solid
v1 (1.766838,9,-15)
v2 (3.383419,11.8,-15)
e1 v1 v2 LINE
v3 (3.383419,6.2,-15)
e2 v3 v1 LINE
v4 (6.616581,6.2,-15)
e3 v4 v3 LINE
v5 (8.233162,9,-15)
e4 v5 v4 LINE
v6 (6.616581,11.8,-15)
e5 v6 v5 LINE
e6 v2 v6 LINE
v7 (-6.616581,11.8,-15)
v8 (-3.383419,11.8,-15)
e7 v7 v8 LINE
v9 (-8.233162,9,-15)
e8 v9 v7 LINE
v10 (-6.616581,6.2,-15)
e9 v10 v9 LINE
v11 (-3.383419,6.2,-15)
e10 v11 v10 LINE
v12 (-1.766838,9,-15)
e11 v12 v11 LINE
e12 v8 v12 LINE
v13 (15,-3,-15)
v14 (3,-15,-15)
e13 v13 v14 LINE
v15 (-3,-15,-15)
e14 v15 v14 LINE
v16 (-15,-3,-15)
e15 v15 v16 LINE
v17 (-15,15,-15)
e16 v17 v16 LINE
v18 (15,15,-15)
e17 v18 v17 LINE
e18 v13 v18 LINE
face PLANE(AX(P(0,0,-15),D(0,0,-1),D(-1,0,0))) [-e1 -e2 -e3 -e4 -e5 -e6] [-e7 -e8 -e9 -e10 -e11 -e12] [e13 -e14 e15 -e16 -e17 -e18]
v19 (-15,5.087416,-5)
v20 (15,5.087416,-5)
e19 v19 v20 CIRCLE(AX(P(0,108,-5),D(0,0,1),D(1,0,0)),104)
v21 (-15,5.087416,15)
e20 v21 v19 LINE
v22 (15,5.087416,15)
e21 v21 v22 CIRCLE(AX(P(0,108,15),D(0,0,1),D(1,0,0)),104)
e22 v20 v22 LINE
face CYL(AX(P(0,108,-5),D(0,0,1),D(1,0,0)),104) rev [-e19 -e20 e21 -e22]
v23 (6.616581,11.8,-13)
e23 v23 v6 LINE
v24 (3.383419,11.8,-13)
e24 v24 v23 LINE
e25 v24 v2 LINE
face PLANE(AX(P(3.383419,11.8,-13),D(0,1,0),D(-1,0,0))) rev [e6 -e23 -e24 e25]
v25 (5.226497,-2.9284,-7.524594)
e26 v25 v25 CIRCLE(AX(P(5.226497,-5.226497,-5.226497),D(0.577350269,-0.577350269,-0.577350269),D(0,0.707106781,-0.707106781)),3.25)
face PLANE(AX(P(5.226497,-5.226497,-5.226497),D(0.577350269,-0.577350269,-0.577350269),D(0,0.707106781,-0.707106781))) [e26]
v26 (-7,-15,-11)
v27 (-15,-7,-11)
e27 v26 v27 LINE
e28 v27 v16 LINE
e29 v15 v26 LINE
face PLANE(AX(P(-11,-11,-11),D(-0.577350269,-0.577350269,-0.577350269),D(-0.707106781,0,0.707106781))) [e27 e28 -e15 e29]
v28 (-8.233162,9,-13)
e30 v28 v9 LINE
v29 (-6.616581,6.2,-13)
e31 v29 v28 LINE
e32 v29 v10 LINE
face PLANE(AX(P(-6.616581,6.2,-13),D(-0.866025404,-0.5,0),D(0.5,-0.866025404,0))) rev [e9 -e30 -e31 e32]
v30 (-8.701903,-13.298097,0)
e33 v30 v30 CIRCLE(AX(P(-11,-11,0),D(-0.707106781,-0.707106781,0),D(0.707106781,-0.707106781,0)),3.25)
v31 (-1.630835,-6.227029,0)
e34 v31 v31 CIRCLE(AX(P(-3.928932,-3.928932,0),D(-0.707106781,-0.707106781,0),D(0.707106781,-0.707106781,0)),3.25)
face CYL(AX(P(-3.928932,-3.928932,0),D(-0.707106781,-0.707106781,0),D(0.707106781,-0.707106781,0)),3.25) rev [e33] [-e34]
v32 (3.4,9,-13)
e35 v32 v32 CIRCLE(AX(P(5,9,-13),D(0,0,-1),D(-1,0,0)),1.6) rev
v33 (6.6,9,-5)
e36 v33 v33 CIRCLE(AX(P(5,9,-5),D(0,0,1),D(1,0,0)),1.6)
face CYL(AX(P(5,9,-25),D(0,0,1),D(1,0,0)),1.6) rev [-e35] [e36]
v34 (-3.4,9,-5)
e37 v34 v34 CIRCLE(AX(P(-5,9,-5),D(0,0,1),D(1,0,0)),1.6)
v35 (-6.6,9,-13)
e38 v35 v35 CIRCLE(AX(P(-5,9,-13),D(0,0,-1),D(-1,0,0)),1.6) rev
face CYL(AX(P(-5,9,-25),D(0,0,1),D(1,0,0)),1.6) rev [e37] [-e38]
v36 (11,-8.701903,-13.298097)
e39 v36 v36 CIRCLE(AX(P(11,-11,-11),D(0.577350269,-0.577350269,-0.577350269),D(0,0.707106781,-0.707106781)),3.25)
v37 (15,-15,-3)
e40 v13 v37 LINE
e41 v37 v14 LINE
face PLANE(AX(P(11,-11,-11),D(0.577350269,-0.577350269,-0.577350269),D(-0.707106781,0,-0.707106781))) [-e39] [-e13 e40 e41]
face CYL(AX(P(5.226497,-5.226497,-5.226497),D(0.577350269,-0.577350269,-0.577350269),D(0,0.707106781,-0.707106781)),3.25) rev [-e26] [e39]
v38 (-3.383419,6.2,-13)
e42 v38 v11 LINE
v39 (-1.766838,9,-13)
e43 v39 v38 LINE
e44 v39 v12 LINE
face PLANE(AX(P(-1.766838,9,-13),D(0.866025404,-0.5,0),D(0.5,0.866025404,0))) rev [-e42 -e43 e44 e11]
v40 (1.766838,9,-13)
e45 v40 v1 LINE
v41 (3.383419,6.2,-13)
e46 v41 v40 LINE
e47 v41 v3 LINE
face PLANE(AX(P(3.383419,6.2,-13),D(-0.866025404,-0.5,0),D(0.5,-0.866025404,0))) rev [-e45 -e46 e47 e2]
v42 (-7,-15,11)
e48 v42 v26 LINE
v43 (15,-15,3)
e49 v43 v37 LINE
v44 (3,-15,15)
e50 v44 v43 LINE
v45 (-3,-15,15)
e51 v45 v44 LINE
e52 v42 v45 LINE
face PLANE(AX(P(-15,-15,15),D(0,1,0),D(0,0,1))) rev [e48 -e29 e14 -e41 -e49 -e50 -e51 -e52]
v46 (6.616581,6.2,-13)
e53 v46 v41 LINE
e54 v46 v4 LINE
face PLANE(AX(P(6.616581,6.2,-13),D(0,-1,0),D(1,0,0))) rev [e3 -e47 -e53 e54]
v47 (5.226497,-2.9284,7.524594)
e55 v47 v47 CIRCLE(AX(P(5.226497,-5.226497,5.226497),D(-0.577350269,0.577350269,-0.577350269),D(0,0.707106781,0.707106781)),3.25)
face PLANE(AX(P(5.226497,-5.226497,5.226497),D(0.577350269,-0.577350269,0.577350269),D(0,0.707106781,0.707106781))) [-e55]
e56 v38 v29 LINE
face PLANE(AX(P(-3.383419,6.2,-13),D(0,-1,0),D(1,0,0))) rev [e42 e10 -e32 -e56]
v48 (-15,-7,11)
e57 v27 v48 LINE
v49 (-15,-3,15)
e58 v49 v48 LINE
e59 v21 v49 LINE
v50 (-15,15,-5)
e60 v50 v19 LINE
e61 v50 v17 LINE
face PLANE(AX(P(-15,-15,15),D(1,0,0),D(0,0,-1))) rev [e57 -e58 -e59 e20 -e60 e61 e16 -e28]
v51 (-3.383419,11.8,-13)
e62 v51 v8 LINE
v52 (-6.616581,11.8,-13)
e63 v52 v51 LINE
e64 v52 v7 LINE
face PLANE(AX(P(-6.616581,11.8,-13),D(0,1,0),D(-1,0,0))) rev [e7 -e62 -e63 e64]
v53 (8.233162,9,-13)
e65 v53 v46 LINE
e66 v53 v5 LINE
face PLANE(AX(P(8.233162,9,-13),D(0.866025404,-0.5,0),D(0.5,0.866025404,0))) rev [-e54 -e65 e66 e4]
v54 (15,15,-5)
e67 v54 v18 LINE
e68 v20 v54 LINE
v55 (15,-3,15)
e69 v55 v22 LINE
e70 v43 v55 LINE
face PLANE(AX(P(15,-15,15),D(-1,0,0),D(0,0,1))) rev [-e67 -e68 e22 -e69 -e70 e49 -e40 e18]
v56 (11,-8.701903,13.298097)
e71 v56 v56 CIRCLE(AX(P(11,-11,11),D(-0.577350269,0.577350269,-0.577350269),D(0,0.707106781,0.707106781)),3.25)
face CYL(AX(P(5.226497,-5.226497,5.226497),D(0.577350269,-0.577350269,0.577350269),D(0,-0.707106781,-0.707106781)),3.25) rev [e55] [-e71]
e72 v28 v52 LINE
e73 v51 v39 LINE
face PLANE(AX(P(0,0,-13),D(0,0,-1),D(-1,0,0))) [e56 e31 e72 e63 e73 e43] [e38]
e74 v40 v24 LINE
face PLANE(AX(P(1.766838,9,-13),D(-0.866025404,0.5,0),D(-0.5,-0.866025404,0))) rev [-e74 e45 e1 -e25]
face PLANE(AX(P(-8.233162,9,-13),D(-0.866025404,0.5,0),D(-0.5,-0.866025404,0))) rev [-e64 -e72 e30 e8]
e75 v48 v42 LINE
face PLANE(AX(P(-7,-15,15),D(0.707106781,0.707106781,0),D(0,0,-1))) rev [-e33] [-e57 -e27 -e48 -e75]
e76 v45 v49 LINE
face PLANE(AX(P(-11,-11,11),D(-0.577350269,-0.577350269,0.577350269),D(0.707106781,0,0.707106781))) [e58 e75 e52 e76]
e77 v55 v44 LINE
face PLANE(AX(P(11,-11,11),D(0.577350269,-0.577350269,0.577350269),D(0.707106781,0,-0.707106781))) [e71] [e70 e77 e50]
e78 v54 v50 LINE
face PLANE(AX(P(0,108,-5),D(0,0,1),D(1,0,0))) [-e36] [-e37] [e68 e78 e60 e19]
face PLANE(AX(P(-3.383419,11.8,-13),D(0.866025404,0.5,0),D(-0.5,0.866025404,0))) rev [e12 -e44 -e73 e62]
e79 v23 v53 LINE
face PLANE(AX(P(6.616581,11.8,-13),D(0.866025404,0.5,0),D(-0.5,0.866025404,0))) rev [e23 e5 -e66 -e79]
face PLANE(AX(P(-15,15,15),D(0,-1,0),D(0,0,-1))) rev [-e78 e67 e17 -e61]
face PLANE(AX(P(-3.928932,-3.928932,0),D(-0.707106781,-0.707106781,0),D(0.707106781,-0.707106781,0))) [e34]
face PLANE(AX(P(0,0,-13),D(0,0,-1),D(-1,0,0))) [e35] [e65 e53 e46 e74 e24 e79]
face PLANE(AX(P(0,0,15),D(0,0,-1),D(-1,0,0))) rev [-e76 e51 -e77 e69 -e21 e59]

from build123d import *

# Parameters (mm, degrees)
ESQUISSE1_W             = 30
ESQUISSE1_H             = 30
BOSS_EXTRU_1_DEPTH      = 15
CHANFREIN1_START        = 19.052558883
CHANFREIN1_OUTLINE_W    = 17
CHANFREIN1_OUTLINE_H    = 20
CHANFREIN1_DEPTH        = 7.947441117
CHANFREIN2_START        = 19.052558883
CHANFREIN2_OUTLINE_W    = 17
CHANFREIN2_OUTLINE_H    = 20
CHANFREIN2_DEPTH        = 7.947441117
ESQUISSE2_R             = 3.25
ENL_V_MAT_EXTRU_1_DEPTH = 10
CHANFREIN4_START        = -27
CHANFREIN4_OUTLINE_W    = 17
CHANFREIN4_OUTLINE_H    = 20
CHANFREIN4_DEPTH        = 7.947441117
CHANFREIN5_START        = -27
CHANFREIN5_OUTLINE_W    = 17
CHANFREIN5_OUTLINE_H    = 20
CHANFREIN5_DEPTH        = 7.947441117
CHANFREIN3_SIZE         = 8
ESQUISSE3_R             = 3.25
ENL_V_MAT_EXTRU_2_DEPTH = 10
ESQUISSE4_R             = 104
ENL_V_MAT_EXTRU_3_DEPTH = 20
ESQUISSE5_R             = 1.6
ENL_V_MAT_EXTRU_4_DEPTH = 20
ENL_V_MAT_EXTRU_5_DEPTH = 2


with BuildPart() as part:
    # Esquisse1 → Boss.-Extru.1 (new, symmetric)
    with BuildSketch(Plane.XY):
        Rectangle(ESQUISSE1_W, ESQUISSE1_H)
    extrude(amount=BOSS_EXTRU_1_DEPTH, both=True)

    # Chanfrein1: read off the stored shape, not the designer's step
    # Chanfrein1 outline → Chanfrein1 (cut)
    with BuildSketch(Plane(origin=(0, 0, 0), x_dir=(0.8164965809277258, 0.40824829046386313, 0.40824829046386313), z_dir=(0.5773502691896258, -0.5773502691896258, -0.5773502691896258)).offset(CHANFREIN1_START)):
        with Locations((-2.5, 0)):
            Rectangle(CHANFREIN1_OUTLINE_W, CHANFREIN1_OUTLINE_H)
    extrude(amount=CHANFREIN1_DEPTH, mode=Mode.SUBTRACT)

    # Chanfrein2: read off the stored shape, not the designer's step
    # Chanfrein2 outline → Chanfrein2 (cut)
    with BuildSketch(Plane(origin=(0, 0, 0), x_dir=(0.8164965809277258, 0.40824829046386313, -0.40824829046386313), z_dir=(0.5773502691896258, -0.5773502691896258, 0.5773502691896258)).offset(CHANFREIN2_START)):
        with Locations((-2.5, 0)):
            Rectangle(CHANFREIN2_OUTLINE_W, CHANFREIN2_OUTLINE_H)
    extrude(amount=CHANFREIN2_DEPTH, mode=Mode.SUBTRACT)

    # Esquisse2 → Enlèv. mat.-Extru.1 (cut)
    with BuildSketch(Plane(origin=(11, -11, -11), x_dir=(-0.40824829046386296, 0.4082482904638631, -0.816496580927726), z_dir=(0.5773502691896257, -0.5773502691896258, -0.5773502691896258))):
        with Locations(Location((0, 0, 0), (0, 0, 30))):
            Circle(ESQUISSE2_R)
    enl_v_mat_extru_1 = extrude(amount=-ENL_V_MAT_EXTRU_1_DEPTH, mode=Mode.SUBTRACT)

    # Symétrie3: Enlèv. mat.-Extru.1 across plane
    add(enl_v_mat_extru_1.mirror(Plane.XY), mode=Mode.SUBTRACT)

    # Chanfrein4: read off the stored shape, not the designer's step
    # Chanfrein4 outline → Chanfrein4 (cut)
    with BuildSketch(Plane(origin=(0, 0, 0), x_dir=(0.8164965809277258, -0.40824829046386313, 0.40824829046386313), z_dir=(0.5773502691896258, 0.5773502691896258, -0.5773502691896258)).offset(CHANFREIN4_START)):
        with Locations((2.5, 0)):
            Rectangle(CHANFREIN4_OUTLINE_W, CHANFREIN4_OUTLINE_H)
    extrude(amount=CHANFREIN4_DEPTH, mode=Mode.SUBTRACT)

    # Chanfrein5: read off the stored shape, not the designer's step
    # Chanfrein5 outline → Chanfrein5 (cut)
    with BuildSketch(Plane(origin=(0, 0, 0), x_dir=(0.8164965809277258, -0.40824829046386313, -0.40824829046386313), z_dir=(0.5773502691896258, 0.5773502691896258, 0.5773502691896258)).offset(CHANFREIN5_START)):
        with Locations((2.5, 0)):
            Rectangle(CHANFREIN5_OUTLINE_W, CHANFREIN5_OUTLINE_H)
    extrude(amount=CHANFREIN5_DEPTH, mode=Mode.SUBTRACT)

    # Chanfrein3
    chanfrein3_edges = [part.edges().sort_by_distance(p)[0] for p in [
        (-15, -15, 0),
    ]]
    chamfer(chanfrein3_edges, length=CHANFREIN3_SIZE)

    # Esquisse3 → Enlèv. mat.-Extru.2 (cut)
    with BuildSketch(Plane(origin=(-11, -11, 0), x_dir=(0, 0, 1), z_dir=(-0.7071067811865487, -0.7071067811865465, 0))):
        with Locations(Location((0, 0, 0), (0, 0, 270))):
            Circle(ESQUISSE3_R)
    extrude(amount=-ENL_V_MAT_EXTRU_2_DEPTH, mode=Mode.SUBTRACT)

    # Esquisse4 → Enlèv. mat.-Extru.3 (cut)
    with BuildSketch(Plane.XY.offset(15)):
        with Locations((0, 108)):
            Circle(ESQUISSE4_R)
    extrude(amount=-ENL_V_MAT_EXTRU_3_DEPTH, mode=Mode.SUBTRACT)

    # Esquisse5 → Enlèv. mat.-Extru.4 (cut)
    with BuildSketch(Plane.XY.offset(-5)):
        with Locations((-5, 9)):
            Circle(ESQUISSE5_R)
        with Locations((5, 9)):
            Circle(ESQUISSE5_R)
    extrude(amount=-ENL_V_MAT_EXTRU_4_DEPTH, mode=Mode.SUBTRACT)

    # Esquisse6 → Enlèv. mat.-Extru.5 (cut)
    with BuildSketch(Plane(origin=(0, 0, -15), x_dir=(-1, 0, 0), z_dir=(0, 0, -1))):
        Polygon((-3.383419246, 11.8), (-6.616580754, 11.8), (-8.233161507, 9), (-6.616580754, 6.2), (-3.383419246, 6.2), (-1.766838493, 9), align=None)
        Polygon((6.616580754, 11.8), (3.383419246, 11.8), (1.766838493, 9), (3.383419246, 6.2), (6.616580754, 6.2), (8.233161507, 9), align=None)
    extrude(amount=-ENL_V_MAT_EXTRU_5_DEPTH, mode=Mode.SUBTRACT)


solid = part.part
